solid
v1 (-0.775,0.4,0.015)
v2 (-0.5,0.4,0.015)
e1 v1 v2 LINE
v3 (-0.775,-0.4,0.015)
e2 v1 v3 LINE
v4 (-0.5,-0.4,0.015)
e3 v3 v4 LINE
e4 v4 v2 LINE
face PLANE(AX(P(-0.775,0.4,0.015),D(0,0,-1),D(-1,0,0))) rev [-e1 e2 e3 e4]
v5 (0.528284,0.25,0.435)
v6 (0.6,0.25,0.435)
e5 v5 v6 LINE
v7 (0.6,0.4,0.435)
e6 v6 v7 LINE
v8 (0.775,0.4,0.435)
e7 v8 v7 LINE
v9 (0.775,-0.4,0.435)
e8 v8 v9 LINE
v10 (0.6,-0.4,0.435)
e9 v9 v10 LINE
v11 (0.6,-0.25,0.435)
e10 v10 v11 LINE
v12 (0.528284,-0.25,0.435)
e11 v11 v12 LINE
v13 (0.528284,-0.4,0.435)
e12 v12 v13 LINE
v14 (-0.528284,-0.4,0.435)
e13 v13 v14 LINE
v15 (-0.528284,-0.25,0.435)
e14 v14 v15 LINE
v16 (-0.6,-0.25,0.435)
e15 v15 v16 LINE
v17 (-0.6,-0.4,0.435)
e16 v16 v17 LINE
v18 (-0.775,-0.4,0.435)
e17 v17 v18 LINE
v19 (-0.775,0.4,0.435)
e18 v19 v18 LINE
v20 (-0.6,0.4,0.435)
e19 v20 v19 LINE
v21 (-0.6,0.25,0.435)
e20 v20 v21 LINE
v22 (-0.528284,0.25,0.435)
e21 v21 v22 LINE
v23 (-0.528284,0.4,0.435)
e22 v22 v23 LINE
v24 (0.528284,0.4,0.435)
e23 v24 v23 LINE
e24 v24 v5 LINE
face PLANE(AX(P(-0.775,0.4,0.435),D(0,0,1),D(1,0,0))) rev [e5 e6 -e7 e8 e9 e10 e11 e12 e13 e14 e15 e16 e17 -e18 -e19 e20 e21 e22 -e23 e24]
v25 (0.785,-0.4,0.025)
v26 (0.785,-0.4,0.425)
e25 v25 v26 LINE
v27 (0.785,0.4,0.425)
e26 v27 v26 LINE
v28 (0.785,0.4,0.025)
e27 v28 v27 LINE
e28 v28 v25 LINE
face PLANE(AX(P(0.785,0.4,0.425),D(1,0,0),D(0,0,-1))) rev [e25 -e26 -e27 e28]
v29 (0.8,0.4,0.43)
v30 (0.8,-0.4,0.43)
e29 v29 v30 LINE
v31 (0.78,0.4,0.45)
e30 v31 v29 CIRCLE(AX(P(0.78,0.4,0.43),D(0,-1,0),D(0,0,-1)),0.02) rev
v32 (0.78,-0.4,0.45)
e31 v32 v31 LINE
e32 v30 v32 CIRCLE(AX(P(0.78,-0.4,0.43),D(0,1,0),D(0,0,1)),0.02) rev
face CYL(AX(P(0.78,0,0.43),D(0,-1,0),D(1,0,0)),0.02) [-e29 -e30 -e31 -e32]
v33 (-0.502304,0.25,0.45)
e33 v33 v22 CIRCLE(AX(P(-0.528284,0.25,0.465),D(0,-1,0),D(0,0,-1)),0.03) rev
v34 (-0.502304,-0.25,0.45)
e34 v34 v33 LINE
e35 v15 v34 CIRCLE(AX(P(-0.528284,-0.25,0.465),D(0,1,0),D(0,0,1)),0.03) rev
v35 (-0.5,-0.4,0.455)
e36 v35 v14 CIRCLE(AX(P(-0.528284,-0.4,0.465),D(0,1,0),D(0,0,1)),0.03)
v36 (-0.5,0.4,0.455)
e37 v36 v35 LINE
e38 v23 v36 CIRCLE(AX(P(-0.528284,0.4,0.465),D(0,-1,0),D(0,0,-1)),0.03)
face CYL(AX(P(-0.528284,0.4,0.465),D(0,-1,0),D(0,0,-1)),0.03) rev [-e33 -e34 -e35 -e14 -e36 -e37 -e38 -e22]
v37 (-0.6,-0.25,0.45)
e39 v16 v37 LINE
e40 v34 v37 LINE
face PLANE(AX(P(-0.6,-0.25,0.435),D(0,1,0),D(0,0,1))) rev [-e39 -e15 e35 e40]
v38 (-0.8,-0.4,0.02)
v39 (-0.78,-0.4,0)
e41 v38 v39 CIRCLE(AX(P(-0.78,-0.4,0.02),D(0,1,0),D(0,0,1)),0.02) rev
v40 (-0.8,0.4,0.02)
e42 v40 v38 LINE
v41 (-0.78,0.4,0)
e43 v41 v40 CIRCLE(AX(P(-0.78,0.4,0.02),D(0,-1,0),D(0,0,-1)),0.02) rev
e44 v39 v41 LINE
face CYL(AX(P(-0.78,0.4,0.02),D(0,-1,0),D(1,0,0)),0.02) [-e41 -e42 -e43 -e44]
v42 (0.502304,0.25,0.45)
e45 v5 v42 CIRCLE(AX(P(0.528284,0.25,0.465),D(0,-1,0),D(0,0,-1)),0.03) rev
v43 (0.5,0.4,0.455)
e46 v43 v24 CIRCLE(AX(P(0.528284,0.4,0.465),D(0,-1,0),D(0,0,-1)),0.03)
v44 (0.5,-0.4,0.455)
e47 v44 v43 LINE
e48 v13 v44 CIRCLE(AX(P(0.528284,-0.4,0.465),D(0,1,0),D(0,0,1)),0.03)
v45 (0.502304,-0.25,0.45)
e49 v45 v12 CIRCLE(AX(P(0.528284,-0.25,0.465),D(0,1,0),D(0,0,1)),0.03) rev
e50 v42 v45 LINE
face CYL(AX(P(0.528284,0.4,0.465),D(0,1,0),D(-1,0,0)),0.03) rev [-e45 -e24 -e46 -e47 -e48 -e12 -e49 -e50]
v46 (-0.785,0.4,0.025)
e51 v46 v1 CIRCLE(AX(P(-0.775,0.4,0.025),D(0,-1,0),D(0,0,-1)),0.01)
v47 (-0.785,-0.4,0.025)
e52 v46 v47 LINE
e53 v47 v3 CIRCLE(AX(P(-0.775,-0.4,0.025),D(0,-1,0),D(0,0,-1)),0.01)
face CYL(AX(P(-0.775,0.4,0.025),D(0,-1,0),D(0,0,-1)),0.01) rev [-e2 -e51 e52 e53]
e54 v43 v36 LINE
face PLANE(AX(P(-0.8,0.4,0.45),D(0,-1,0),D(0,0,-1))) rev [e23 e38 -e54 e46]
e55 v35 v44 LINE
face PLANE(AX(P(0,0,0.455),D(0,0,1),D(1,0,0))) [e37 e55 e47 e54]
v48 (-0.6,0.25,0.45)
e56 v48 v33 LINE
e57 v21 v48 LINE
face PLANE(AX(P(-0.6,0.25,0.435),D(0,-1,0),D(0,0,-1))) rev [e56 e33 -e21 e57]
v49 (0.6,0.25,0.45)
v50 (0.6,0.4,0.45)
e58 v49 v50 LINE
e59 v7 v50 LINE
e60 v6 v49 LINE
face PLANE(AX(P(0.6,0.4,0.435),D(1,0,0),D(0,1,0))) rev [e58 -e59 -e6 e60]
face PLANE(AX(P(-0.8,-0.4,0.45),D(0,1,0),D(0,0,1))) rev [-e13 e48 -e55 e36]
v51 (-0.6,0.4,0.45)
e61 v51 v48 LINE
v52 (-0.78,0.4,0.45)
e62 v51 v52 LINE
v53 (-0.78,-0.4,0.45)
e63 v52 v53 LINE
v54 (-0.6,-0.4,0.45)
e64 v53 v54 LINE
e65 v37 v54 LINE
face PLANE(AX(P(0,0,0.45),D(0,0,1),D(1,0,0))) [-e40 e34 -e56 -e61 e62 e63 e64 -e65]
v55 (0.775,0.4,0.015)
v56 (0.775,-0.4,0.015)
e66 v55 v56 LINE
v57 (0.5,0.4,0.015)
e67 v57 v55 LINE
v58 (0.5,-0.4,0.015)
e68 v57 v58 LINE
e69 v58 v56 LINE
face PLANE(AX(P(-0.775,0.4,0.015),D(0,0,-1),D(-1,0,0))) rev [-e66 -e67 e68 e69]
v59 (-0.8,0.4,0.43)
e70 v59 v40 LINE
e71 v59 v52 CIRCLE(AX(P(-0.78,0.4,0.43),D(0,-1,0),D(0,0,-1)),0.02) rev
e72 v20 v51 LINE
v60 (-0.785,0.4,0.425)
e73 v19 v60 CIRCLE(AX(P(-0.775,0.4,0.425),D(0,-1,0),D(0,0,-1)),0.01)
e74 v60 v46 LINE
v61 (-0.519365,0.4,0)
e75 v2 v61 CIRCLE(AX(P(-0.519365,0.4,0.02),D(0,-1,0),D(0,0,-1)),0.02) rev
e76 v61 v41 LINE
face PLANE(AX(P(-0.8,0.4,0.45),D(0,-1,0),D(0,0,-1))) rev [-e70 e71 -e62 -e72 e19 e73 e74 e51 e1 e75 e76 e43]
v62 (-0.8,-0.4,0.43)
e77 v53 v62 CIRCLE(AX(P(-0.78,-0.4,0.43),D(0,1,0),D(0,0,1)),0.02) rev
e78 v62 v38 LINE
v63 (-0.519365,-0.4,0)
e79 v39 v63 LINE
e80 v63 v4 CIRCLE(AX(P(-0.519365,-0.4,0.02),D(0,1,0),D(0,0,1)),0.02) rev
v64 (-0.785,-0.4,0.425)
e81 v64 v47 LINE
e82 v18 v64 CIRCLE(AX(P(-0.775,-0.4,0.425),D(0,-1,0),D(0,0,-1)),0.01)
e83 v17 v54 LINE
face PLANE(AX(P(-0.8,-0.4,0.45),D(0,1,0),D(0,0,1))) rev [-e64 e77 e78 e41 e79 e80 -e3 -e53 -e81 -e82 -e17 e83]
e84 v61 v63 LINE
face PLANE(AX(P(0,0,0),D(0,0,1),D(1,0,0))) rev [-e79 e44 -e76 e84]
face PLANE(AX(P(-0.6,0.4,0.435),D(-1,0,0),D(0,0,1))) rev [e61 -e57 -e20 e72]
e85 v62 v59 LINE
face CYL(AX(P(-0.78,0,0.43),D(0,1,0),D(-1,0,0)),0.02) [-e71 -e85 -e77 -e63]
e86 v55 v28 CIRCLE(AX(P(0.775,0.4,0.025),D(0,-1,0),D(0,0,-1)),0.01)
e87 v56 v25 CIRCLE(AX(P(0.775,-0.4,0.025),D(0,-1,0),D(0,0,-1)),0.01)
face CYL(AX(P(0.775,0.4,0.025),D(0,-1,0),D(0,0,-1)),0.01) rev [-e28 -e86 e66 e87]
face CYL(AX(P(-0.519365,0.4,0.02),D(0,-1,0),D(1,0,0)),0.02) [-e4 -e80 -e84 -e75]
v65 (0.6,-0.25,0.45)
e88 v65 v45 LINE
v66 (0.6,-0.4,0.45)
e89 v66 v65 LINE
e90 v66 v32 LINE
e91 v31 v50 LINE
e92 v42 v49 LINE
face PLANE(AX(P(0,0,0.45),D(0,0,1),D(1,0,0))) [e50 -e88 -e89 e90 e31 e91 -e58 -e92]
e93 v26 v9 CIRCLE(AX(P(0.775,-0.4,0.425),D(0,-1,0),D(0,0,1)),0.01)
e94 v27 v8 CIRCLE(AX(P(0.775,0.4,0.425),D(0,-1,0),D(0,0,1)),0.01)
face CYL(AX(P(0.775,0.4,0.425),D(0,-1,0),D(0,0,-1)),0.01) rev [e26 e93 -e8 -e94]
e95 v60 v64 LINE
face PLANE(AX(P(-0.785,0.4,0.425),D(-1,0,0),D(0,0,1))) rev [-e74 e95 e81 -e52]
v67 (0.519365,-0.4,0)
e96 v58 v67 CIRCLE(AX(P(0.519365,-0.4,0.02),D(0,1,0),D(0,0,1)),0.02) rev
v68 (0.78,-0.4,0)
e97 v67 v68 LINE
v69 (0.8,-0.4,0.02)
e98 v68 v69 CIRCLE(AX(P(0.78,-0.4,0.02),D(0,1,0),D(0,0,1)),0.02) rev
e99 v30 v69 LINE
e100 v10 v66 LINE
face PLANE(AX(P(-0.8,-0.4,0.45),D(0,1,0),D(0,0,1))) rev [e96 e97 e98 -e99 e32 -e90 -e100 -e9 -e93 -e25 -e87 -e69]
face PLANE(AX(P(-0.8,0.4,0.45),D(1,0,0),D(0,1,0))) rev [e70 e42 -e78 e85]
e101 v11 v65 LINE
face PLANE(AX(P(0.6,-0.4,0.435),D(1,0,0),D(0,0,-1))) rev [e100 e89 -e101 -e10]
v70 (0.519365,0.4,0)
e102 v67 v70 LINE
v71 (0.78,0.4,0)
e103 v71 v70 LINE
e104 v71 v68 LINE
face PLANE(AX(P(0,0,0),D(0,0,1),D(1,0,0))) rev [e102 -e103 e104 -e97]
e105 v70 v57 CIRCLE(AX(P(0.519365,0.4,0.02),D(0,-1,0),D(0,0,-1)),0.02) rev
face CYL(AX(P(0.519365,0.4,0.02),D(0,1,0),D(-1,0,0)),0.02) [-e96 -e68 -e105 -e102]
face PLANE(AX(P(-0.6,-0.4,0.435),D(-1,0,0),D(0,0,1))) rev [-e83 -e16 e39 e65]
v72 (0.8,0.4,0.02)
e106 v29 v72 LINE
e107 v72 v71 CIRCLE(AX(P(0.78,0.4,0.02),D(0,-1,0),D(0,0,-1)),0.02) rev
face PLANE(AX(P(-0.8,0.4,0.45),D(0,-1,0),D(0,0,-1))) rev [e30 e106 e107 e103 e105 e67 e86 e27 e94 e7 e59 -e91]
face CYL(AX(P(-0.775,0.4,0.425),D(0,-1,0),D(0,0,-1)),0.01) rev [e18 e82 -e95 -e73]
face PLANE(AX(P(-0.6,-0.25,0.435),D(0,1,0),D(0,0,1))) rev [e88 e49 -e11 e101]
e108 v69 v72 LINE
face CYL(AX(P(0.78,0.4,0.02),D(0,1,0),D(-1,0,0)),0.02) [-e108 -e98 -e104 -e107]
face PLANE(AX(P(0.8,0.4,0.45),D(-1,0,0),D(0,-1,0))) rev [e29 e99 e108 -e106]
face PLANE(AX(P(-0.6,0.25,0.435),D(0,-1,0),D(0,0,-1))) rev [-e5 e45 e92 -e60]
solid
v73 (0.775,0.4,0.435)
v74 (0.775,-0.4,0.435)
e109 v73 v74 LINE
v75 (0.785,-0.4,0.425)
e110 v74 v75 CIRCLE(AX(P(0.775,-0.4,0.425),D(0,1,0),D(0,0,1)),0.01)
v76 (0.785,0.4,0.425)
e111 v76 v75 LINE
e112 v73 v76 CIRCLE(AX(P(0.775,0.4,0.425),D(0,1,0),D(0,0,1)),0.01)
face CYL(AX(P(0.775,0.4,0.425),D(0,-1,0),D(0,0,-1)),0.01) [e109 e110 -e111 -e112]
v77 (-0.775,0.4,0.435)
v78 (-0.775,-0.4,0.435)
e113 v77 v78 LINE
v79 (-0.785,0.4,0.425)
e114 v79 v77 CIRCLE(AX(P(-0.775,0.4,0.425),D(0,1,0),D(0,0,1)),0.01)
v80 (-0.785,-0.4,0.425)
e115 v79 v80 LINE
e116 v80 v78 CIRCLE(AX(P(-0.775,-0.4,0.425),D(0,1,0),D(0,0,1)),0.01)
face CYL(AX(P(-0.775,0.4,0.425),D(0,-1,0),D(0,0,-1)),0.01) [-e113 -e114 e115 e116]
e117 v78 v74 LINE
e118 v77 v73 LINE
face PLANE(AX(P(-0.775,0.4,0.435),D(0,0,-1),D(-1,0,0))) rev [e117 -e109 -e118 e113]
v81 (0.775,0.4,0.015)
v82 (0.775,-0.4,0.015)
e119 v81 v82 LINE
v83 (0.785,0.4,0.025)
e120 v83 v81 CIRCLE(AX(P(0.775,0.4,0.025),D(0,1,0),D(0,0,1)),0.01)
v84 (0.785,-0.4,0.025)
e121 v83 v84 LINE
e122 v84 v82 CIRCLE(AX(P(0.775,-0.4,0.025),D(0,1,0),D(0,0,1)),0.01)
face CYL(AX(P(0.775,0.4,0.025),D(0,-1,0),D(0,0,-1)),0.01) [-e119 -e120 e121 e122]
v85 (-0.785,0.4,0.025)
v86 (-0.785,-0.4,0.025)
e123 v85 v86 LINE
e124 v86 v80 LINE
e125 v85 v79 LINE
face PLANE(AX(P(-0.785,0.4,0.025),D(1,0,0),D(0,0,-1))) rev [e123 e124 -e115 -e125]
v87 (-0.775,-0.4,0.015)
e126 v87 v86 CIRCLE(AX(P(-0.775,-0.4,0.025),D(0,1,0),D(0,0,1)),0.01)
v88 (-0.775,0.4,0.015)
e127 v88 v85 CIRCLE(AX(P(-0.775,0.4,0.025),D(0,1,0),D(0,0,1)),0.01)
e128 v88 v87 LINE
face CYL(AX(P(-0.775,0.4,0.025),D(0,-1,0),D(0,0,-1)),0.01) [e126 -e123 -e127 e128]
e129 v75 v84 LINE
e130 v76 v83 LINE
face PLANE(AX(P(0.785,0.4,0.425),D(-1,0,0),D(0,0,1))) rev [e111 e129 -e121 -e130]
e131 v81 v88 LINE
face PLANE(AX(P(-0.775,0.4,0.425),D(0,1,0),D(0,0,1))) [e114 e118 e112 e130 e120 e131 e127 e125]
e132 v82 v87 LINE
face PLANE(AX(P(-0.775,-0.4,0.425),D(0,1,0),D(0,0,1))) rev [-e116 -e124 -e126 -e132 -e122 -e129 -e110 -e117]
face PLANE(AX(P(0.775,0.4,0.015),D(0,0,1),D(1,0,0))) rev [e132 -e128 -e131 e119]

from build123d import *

# Parameters (mm, degrees)
SKETCH1_W                        = 1.6
SKETCH1_H                        = 0.8
ALL_BODY_EXTRUDE_DEPTH           = 0.45
SKETCH3_W                        = 1.2
SKETCH3_H                        = 0.15
CUT_OUT_FOR_PIN_UPPER_DEPTH      = 0.015
SKETCH2_W                        = 1
SKETCH2_H                        = 0.8
CUT_OUT_FOR_PIN_LOWER_DEPTH      = 0.015
SKETCH4_W                        = 1
SKETCH4_H                        = 0.8
COATING_EXTRUDE_DEPTH            = 0.02
COATING_START                    = -0.4
COATING_FILLET_DEPTH             = 0.8
BODY_CUT_OUT_FOR_TOTAL_PIN_DEPTH = 2.219436345
BODY_EXTRUDE_DEPTH               = 0.8
PIN_FILLET_R                     = 0.02


with BuildPart() as part:
    # Sketch1 → All body extrude (new body)
    with BuildSketch(Plane.XY):
        Rectangle(SKETCH1_W, SKETCH1_H)
    extrude(amount=ALL_BODY_EXTRUDE_DEPTH)

    # Sketch3 → Cut out for pin-upper (cut)
    with BuildSketch(Plane.XY.offset(0.45)):
        with Locations((0, 0.325)):
            Rectangle(SKETCH3_W, SKETCH3_H)
        with Locations((0, -0.325)):
            Rectangle(SKETCH3_W, SKETCH3_H)
    extrude(amount=-CUT_OUT_FOR_PIN_UPPER_DEPTH, mode=Mode.SUBTRACT)

    # Sketch2 → Cut out for pin-lower (cut)
    with BuildSketch(Plane(origin=(0, 0, 0), x_dir=(-1, 0, 0), z_dir=(0, 0, -1))):
        Rectangle(SKETCH2_W, SKETCH2_H)
    extrude(amount=-CUT_OUT_FOR_PIN_LOWER_DEPTH, mode=Mode.SUBTRACT)

    # Sketch4 → Coating extrude (add)
    with BuildSketch(Plane.XY.offset(0.435)):
        Rectangle(SKETCH4_W, SKETCH4_H)
    extrude(amount=COATING_EXTRUDE_DEPTH)

    # Coating fillet: read off the stored shape, not the designer's step
    # Coating fillet outline → Coating fillet (add)
    with BuildSketch(Plane(origin=(0, 0, 0), x_dir=(1, 0, 0), z_dir=(0, 1, 0)).offset(COATING_START)):
        with BuildLine():
            Line((-0.5, -0.435), (-0.528284271, -0.435))
            ThreePointArc((-0.528284271, -0.435), (-0.510963763, -0.440505103), (-0.5, -0.455))
            Line((-0.5, -0.455), (-0.5, -0.435))
        make_face()
        with BuildLine():
            ThreePointArc((0.5, -0.455), (0.510963763, -0.440505103), (0.528284271, -0.435))
            Line((0.528284271, -0.435), (0.5, -0.435))
            Line((0.5, -0.435), (0.5, -0.455))
        make_face()
    extrude(amount=COATING_FILLET_DEPTH)

    # Sketch6 → Body cut out for total pin (cut, through all)
    with BuildSketch(Plane.XZ.offset(0.4)):
        with BuildLine():
            Line((-0.775, 0.435), (0.775, 0.435))
            ThreePointArc((0.775, 0.435), (0.782071068, 0.432071068), (0.785, 0.425))
            Line((0.785, 0.425), (0.785, 0.025))
            ThreePointArc((0.785, 0.025), (0.782071068, 0.017928932), (0.775, 0.015))
            Line((0.775, 0.015), (-0.775, 0.015))
            ThreePointArc((-0.775, 0.015), (-0.782071068, 0.017928932), (-0.785, 0.025))
            Line((-0.785, 0.025), (-0.785, 0.425))
            ThreePointArc((-0.785, 0.425), (-0.782071068, 0.432071068), (-0.775, 0.435))
        make_face()
    extrude(amount=-BODY_CUT_OUT_FOR_TOTAL_PIN_DEPTH, mode=Mode.SUBTRACT)

    # Pin fillet
    # the kernel refuses this fillet: 0.02 mm, written as the material it takes off along each edge
    with BuildSketch(Plane(origin=(0.8, 0.45, 0.45), x_dir=(-1, 0, 0), z_dir=(0, -1, 0)), Plane(origin=(-0.8, -0.45, 0.45), x_dir=(1, 0, 0), z_dir=(0, 1, 0))) as pin_fillet_piece_1:
        with BuildLine():
            CenterArc((PIN_FILLET_R, PIN_FILLET_R), PIN_FILLET_R, 180, 90)
            Line((0, PIN_FILLET_R), (-PIN_FILLET_R * 0.02, PIN_FILLET_R))
            Line((-PIN_FILLET_R * 0.02, PIN_FILLET_R), (-PIN_FILLET_R * 0.02, -PIN_FILLET_R * 0.02))
            Line((-PIN_FILLET_R * 0.02, -PIN_FILLET_R * 0.02), (PIN_FILLET_R, -PIN_FILLET_R * 0.02))
            Line((PIN_FILLET_R, -PIN_FILLET_R * 0.02), (PIN_FILLET_R, 0))
        make_face()
    extrude(amount=0.9, mode=Mode.SUBTRACT)
    with BuildSketch(Plane(origin=(0.8, 0.45, 0), x_dir=(-1, 0, 0), z_dir=(0, -1, 0)), Plane(origin=(-0.8, -0.45, 0), x_dir=(1, 0, 0), z_dir=(0, 1, 0))) as pin_fillet_piece_2:
        with BuildLine():
            CenterArc((PIN_FILLET_R, -PIN_FILLET_R), PIN_FILLET_R, 90, 90)
            Line((0, -PIN_FILLET_R), (-PIN_FILLET_R * 0.02, -PIN_FILLET_R))
            Line((-PIN_FILLET_R * 0.02, -PIN_FILLET_R), (-PIN_FILLET_R * 0.02, PIN_FILLET_R * 0.02))
            Line((-PIN_FILLET_R * 0.02, PIN_FILLET_R * 0.02), (PIN_FILLET_R, PIN_FILLET_R * 0.02))
            Line((PIN_FILLET_R, PIN_FILLET_R * 0.02), (PIN_FILLET_R, 0))
        make_face()
    extrude(amount=0.9, mode=Mode.SUBTRACT)
    with BuildSketch(Plane(origin=(0.5, -0.448412292, 0), x_dir=(1, 0, 0), z_dir=(0, 1, 0)), Plane(origin=(-0.5, 0.448412292, 0), x_dir=(-1, 0, 0), z_dir=(0, -1, 0))) as pin_fillet_piece_3:
        with BuildLine():
            CenterArc((0.019364917, -0.02), PIN_FILLET_R, 90, 75.522487815)
            Line((0, -0.015), (-0.000387298, -0.0149))
            ThreePointArc((-0.000387298, -0.0149), (-0.0004, -0.0075), (-0.0004, 0))
            Line((-0.0004, 0), (0, 0.0004))
            Line((0, 0.0004), (0.019364917, 0.0004))
            Line((0.019364917, 0.0004), (0.019364917, 0))
        make_face()
    extrude(amount=0.896824584, mode=Mode.SUBTRACT)


with BuildPart() as body_2:
    # Sketch7 → Body extrude (new, through all)
    with BuildSketch(Plane(origin=(0, -0.4, 0), x_dir=(1, 0, 0), z_dir=(0, 1, 0))):
        with BuildLine():
            Line((-0.775, -0.435), (0.775, -0.435))
            ThreePointArc((0.775, -0.435), (0.782071068, -0.432071068), (0.785, -0.425))
            Line((0.785, -0.425), (0.785, -0.025))
            ThreePointArc((0.785, -0.025), (0.782071068, -0.017928932), (0.775, -0.015))
            Line((0.775, -0.015), (-0.775, -0.015))
            ThreePointArc((-0.775, -0.015), (-0.782071068, -0.017928932), (-0.785, -0.025))
            Line((-0.785, -0.025), (-0.785, -0.425))
            ThreePointArc((-0.785, -0.425), (-0.782071068, -0.432071068), (-0.775, -0.435))
        make_face()
    extrude(amount=BODY_EXTRUDE_DEPTH)


solid = Compound([part.part, body_2.part])
